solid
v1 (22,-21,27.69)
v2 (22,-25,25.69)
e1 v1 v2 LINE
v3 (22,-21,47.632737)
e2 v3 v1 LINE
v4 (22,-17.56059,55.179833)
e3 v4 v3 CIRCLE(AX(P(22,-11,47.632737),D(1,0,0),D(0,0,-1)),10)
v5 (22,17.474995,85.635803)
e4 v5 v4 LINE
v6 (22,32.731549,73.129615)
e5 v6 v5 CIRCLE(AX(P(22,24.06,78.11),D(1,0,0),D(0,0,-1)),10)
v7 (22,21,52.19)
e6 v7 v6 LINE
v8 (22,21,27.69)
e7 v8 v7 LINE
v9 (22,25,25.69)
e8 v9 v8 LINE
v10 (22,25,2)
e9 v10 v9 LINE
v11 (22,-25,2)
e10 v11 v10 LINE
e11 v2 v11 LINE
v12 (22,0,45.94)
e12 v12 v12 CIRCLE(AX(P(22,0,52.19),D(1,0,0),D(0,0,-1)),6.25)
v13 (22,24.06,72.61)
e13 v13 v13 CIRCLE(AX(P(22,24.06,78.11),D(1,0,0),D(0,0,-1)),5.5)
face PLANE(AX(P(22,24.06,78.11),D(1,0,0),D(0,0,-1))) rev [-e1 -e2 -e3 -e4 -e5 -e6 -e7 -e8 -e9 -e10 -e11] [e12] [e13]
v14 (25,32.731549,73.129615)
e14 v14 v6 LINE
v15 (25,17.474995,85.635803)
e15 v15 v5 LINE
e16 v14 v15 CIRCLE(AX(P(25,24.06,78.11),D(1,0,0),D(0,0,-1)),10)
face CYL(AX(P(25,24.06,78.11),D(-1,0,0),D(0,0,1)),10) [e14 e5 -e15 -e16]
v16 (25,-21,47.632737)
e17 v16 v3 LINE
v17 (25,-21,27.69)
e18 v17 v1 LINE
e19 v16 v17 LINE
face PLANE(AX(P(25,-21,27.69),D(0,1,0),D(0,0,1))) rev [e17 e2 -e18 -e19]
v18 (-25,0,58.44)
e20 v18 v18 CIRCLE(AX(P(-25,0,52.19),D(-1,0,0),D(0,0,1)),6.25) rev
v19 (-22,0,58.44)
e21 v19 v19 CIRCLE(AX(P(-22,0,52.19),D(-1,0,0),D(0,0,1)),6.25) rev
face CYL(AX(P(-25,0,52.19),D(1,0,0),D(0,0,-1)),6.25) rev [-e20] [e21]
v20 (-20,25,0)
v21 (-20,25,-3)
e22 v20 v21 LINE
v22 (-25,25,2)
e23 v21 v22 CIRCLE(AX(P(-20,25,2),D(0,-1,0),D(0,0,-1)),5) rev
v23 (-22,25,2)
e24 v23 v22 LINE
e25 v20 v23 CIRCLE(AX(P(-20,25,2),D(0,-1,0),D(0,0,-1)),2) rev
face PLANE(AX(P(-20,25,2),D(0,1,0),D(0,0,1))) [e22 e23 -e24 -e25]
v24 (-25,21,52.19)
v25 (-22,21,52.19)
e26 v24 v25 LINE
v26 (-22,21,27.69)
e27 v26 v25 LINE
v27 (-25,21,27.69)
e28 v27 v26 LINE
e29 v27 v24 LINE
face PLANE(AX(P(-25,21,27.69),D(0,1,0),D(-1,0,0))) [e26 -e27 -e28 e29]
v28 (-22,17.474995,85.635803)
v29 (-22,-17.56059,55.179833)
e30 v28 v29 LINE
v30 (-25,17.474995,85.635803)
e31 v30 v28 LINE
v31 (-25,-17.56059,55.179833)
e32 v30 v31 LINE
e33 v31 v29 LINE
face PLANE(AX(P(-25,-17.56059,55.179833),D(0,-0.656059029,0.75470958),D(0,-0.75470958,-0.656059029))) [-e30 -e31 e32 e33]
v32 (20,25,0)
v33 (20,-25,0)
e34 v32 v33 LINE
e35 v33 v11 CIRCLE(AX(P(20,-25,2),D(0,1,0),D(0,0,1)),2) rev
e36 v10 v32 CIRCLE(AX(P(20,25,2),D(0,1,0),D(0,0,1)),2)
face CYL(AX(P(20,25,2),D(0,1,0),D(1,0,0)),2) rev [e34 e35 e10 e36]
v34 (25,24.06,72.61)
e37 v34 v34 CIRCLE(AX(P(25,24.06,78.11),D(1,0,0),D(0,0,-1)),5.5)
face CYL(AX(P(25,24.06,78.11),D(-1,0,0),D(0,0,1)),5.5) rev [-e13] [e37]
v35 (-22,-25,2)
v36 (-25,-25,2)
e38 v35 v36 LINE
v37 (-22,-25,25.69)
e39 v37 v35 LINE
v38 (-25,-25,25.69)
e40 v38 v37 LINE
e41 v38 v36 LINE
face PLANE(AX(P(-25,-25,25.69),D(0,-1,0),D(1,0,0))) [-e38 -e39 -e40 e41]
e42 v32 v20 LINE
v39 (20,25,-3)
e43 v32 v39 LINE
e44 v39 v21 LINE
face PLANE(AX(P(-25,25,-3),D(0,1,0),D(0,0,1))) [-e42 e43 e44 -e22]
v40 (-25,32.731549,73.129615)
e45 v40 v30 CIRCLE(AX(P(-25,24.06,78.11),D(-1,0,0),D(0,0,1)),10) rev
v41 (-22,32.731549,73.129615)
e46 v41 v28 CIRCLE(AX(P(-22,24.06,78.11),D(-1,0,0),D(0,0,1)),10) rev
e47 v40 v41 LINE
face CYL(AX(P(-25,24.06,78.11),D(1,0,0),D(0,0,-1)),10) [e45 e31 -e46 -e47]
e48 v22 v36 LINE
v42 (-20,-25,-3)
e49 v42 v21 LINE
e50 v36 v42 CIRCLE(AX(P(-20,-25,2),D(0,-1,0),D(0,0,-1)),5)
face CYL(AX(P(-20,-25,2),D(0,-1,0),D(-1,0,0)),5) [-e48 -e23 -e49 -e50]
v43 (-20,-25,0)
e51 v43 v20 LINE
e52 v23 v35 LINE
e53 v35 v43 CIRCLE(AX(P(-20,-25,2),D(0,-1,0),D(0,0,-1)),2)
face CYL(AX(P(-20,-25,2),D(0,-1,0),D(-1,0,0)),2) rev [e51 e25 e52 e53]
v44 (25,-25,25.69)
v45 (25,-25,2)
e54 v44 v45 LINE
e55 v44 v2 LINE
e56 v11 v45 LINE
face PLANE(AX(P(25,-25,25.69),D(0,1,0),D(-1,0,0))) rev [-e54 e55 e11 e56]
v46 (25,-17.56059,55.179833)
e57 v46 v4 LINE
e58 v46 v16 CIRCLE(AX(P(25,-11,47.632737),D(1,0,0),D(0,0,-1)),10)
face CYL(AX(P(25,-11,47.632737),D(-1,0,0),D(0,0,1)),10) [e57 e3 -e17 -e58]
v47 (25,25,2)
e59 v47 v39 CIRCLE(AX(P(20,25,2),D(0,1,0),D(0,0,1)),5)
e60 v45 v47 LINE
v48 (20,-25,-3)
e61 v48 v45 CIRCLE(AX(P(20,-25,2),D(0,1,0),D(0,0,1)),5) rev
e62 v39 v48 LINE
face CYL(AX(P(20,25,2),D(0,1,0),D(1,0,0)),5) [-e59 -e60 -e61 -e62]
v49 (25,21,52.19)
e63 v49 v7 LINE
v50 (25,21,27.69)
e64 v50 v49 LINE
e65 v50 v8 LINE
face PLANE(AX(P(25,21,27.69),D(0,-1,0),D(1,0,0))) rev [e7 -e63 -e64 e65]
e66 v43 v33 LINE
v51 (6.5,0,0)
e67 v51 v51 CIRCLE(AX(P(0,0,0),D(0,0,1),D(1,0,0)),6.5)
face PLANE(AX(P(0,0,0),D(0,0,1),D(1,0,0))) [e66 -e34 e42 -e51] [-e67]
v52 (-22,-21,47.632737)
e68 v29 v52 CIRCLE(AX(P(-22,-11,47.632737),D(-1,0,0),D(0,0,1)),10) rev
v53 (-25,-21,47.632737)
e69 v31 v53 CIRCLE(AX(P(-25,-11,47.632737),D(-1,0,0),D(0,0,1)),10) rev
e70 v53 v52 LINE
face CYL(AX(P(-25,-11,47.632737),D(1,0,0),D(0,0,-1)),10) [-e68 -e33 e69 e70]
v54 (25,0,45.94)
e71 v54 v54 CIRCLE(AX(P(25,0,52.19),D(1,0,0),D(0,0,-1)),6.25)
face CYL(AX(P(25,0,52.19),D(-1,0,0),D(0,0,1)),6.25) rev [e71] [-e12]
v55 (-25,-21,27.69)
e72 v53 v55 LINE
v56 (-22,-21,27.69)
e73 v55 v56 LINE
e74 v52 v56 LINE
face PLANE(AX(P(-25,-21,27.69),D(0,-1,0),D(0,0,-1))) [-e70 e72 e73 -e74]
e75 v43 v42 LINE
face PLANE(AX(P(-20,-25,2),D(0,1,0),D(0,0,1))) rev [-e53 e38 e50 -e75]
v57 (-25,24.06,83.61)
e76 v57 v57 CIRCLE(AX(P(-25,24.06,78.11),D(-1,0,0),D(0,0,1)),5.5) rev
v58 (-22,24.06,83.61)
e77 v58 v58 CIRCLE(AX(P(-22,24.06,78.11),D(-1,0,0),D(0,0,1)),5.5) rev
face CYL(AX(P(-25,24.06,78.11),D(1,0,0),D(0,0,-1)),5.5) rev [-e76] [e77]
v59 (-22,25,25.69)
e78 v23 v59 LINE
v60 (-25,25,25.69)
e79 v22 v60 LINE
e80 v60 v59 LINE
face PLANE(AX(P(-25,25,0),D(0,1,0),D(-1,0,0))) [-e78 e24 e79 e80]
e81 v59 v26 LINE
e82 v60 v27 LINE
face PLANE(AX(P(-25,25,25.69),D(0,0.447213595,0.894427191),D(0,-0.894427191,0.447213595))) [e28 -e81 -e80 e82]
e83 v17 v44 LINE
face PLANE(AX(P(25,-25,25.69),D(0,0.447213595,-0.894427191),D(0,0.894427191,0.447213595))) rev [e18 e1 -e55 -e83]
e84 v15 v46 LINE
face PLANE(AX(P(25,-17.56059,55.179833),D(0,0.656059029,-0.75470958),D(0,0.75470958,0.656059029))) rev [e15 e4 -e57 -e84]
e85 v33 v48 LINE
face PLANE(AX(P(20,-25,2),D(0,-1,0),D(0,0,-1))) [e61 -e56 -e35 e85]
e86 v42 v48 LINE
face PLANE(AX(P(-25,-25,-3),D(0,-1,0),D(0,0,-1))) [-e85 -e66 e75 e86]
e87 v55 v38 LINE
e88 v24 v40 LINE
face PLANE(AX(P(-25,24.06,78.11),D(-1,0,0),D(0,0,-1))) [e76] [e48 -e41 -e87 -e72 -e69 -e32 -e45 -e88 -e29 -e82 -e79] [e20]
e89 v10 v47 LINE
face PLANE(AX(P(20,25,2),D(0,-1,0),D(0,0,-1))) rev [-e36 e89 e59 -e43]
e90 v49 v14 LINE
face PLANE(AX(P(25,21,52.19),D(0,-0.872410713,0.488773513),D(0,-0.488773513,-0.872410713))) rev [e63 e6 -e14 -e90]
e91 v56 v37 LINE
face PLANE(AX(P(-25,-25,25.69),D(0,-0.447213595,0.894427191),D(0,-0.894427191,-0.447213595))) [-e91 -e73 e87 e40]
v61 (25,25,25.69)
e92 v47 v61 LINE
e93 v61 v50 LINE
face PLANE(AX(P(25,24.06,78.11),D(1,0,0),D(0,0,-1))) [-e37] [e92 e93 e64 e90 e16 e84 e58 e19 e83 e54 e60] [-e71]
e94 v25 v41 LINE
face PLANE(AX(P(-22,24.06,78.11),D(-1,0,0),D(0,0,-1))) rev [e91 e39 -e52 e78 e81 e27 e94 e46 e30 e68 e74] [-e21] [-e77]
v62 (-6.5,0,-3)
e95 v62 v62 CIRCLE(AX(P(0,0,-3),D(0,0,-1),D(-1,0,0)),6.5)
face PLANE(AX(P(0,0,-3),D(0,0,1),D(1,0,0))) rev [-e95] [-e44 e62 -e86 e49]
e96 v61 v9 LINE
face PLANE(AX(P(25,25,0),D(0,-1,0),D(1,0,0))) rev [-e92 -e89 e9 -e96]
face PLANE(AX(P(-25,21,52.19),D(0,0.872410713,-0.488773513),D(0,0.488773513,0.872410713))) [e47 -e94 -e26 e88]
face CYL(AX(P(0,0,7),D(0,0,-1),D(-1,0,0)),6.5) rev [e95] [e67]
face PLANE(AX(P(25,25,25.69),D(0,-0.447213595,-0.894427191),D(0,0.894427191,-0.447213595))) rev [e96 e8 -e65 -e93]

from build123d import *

# Parameters (mm, degrees)
SKETCH1_W                    = 50
SKETCH1_H                    = 50
BASE_FLANGE2_DEPTH           = 3
EDGE_FLANGE1_STRIP_W         = 16
EDGE_FLANGE1_STRIP_H         = 3
EDGE_FLANGE1_STRIP_CUT_DEPTH = 50
EDGE_FLANGE1_DEPTH           = 50
EDGE_FLANGE1_PROFILE_R       = 6.25
EDGE_FLANGE1_PROFILE_R_2     = 5.5
EDGE_FLANGE1_FLAT_DEPTH      = 3
SKETCH22_R                   = 6.5
CUT_EXTRUDE1_DEPTH           = 10


# Sheet-metal steps are written as plain solids
with BuildPart() as part:
    # Sketch1 → Base-Flange2 (new body)
    with BuildSketch(Plane.XY):
        Rectangle(SKETCH1_W, SKETCH1_H)
    extrude(amount=-BASE_FLANGE2_DEPTH)

    # Edge-Flange1 strip (across the edge) → Edge-Flange1 strip cut (cut)
    with BuildSketch(Plane(origin=(25, -25, 0), x_dir=(-1, 0, 0), z_dir=(0, 1, 0))):
        with Locations((-3, -1.5)):
            Rectangle(EDGE_FLANGE1_STRIP_W, EDGE_FLANGE1_STRIP_H)
    edge_flange1_strip_cut = extrude(amount=EDGE_FLANGE1_STRIP_CUT_DEPTH, mode=Mode.SUBTRACT)

    # Edge-Flange1 bend section (across the edge) → Edge-Flange1 (add)
    with BuildSketch(Plane(origin=(25, -25, 0), x_dir=(-1, 0, 0), z_dir=(0, 1, 0))):
        with BuildLine():
            Line((0, 2), (3, 2))
            ThreePointArc((3, 2), (3.585786438, 0.585786438), (5, 0))
            Line((5, 0), (5, -3))
            ThreePointArc((5, -3), (1.464466094, -1.535533906), (0, 2))
        make_face()
    edge_flange1 = extrude(amount=EDGE_FLANGE1_DEPTH)

    # Edge-Flange1 profile (on flange) → Edge-Flange1 flat (add)
    with BuildSketch(Plane.YZ.offset(25)):
        with BuildLine():
            ThreePointArc((32.731549172, 73.12961498), (30.399526878, 85.843718314), (17.474995057, 85.635802941))
            Line((17.474995057, 85.635802941), (-17.56059029, 55.179833247))
            ThreePointArc((-17.56059029, 55.179833247), (-20.099612709, 51.779669871), (-21, 47.632737445))
            Line((-21, 47.632737445), (-21, 27.69))
            Line((-21, 27.69), (-25, 25.69))
            Line((-25, 25.69), (-25, 2))
            Line((-25, 2), (25, 2))
            Line((25, 2), (25, 25.69))
            Line((25, 25.69), (21, 27.69))
            Line((21, 27.69), (21, 52.19))
            Line((21, 52.19), (32.731549172, 73.12961498))
        make_face()
        with Locations((0, 52.19)):
            Circle(EDGE_FLANGE1_PROFILE_R, mode=Mode.SUBTRACT)
        with Locations((24.06, 78.11)):
            Circle(EDGE_FLANGE1_PROFILE_R_2, mode=Mode.SUBTRACT)
    edge_flange1_flat = extrude(amount=-EDGE_FLANGE1_FLAT_DEPTH)

    # Mirror1: Edge-Flange1 strip cut, Edge-Flange1, Edge-Flange1 flat across plane
    add(edge_flange1_strip_cut.mirror(Plane(origin=(0, 0, 0), x_dir=(0, 0, 1), z_dir=(1, 0, 0))), mode=Mode.SUBTRACT)
    add(edge_flange1.mirror(Plane(origin=(0, 0, 0), x_dir=(0, 0, 1), z_dir=(1, 0, 0))))
    add(edge_flange1_flat.mirror(Plane(origin=(0, 0, 0), x_dir=(0, 0, 1), z_dir=(1, 0, 0))))

    # Sketch22 → Cut-Extrude1 (cut)
    with BuildSketch(Plane(origin=(0, 0, -3), x_dir=(-1, 0, 0), z_dir=(0, 0, -1))):
        Circle(SKETCH22_R)
    extrude(amount=-CUT_EXTRUDE1_DEPTH, mode=Mode.SUBTRACT)


solid = part.part
